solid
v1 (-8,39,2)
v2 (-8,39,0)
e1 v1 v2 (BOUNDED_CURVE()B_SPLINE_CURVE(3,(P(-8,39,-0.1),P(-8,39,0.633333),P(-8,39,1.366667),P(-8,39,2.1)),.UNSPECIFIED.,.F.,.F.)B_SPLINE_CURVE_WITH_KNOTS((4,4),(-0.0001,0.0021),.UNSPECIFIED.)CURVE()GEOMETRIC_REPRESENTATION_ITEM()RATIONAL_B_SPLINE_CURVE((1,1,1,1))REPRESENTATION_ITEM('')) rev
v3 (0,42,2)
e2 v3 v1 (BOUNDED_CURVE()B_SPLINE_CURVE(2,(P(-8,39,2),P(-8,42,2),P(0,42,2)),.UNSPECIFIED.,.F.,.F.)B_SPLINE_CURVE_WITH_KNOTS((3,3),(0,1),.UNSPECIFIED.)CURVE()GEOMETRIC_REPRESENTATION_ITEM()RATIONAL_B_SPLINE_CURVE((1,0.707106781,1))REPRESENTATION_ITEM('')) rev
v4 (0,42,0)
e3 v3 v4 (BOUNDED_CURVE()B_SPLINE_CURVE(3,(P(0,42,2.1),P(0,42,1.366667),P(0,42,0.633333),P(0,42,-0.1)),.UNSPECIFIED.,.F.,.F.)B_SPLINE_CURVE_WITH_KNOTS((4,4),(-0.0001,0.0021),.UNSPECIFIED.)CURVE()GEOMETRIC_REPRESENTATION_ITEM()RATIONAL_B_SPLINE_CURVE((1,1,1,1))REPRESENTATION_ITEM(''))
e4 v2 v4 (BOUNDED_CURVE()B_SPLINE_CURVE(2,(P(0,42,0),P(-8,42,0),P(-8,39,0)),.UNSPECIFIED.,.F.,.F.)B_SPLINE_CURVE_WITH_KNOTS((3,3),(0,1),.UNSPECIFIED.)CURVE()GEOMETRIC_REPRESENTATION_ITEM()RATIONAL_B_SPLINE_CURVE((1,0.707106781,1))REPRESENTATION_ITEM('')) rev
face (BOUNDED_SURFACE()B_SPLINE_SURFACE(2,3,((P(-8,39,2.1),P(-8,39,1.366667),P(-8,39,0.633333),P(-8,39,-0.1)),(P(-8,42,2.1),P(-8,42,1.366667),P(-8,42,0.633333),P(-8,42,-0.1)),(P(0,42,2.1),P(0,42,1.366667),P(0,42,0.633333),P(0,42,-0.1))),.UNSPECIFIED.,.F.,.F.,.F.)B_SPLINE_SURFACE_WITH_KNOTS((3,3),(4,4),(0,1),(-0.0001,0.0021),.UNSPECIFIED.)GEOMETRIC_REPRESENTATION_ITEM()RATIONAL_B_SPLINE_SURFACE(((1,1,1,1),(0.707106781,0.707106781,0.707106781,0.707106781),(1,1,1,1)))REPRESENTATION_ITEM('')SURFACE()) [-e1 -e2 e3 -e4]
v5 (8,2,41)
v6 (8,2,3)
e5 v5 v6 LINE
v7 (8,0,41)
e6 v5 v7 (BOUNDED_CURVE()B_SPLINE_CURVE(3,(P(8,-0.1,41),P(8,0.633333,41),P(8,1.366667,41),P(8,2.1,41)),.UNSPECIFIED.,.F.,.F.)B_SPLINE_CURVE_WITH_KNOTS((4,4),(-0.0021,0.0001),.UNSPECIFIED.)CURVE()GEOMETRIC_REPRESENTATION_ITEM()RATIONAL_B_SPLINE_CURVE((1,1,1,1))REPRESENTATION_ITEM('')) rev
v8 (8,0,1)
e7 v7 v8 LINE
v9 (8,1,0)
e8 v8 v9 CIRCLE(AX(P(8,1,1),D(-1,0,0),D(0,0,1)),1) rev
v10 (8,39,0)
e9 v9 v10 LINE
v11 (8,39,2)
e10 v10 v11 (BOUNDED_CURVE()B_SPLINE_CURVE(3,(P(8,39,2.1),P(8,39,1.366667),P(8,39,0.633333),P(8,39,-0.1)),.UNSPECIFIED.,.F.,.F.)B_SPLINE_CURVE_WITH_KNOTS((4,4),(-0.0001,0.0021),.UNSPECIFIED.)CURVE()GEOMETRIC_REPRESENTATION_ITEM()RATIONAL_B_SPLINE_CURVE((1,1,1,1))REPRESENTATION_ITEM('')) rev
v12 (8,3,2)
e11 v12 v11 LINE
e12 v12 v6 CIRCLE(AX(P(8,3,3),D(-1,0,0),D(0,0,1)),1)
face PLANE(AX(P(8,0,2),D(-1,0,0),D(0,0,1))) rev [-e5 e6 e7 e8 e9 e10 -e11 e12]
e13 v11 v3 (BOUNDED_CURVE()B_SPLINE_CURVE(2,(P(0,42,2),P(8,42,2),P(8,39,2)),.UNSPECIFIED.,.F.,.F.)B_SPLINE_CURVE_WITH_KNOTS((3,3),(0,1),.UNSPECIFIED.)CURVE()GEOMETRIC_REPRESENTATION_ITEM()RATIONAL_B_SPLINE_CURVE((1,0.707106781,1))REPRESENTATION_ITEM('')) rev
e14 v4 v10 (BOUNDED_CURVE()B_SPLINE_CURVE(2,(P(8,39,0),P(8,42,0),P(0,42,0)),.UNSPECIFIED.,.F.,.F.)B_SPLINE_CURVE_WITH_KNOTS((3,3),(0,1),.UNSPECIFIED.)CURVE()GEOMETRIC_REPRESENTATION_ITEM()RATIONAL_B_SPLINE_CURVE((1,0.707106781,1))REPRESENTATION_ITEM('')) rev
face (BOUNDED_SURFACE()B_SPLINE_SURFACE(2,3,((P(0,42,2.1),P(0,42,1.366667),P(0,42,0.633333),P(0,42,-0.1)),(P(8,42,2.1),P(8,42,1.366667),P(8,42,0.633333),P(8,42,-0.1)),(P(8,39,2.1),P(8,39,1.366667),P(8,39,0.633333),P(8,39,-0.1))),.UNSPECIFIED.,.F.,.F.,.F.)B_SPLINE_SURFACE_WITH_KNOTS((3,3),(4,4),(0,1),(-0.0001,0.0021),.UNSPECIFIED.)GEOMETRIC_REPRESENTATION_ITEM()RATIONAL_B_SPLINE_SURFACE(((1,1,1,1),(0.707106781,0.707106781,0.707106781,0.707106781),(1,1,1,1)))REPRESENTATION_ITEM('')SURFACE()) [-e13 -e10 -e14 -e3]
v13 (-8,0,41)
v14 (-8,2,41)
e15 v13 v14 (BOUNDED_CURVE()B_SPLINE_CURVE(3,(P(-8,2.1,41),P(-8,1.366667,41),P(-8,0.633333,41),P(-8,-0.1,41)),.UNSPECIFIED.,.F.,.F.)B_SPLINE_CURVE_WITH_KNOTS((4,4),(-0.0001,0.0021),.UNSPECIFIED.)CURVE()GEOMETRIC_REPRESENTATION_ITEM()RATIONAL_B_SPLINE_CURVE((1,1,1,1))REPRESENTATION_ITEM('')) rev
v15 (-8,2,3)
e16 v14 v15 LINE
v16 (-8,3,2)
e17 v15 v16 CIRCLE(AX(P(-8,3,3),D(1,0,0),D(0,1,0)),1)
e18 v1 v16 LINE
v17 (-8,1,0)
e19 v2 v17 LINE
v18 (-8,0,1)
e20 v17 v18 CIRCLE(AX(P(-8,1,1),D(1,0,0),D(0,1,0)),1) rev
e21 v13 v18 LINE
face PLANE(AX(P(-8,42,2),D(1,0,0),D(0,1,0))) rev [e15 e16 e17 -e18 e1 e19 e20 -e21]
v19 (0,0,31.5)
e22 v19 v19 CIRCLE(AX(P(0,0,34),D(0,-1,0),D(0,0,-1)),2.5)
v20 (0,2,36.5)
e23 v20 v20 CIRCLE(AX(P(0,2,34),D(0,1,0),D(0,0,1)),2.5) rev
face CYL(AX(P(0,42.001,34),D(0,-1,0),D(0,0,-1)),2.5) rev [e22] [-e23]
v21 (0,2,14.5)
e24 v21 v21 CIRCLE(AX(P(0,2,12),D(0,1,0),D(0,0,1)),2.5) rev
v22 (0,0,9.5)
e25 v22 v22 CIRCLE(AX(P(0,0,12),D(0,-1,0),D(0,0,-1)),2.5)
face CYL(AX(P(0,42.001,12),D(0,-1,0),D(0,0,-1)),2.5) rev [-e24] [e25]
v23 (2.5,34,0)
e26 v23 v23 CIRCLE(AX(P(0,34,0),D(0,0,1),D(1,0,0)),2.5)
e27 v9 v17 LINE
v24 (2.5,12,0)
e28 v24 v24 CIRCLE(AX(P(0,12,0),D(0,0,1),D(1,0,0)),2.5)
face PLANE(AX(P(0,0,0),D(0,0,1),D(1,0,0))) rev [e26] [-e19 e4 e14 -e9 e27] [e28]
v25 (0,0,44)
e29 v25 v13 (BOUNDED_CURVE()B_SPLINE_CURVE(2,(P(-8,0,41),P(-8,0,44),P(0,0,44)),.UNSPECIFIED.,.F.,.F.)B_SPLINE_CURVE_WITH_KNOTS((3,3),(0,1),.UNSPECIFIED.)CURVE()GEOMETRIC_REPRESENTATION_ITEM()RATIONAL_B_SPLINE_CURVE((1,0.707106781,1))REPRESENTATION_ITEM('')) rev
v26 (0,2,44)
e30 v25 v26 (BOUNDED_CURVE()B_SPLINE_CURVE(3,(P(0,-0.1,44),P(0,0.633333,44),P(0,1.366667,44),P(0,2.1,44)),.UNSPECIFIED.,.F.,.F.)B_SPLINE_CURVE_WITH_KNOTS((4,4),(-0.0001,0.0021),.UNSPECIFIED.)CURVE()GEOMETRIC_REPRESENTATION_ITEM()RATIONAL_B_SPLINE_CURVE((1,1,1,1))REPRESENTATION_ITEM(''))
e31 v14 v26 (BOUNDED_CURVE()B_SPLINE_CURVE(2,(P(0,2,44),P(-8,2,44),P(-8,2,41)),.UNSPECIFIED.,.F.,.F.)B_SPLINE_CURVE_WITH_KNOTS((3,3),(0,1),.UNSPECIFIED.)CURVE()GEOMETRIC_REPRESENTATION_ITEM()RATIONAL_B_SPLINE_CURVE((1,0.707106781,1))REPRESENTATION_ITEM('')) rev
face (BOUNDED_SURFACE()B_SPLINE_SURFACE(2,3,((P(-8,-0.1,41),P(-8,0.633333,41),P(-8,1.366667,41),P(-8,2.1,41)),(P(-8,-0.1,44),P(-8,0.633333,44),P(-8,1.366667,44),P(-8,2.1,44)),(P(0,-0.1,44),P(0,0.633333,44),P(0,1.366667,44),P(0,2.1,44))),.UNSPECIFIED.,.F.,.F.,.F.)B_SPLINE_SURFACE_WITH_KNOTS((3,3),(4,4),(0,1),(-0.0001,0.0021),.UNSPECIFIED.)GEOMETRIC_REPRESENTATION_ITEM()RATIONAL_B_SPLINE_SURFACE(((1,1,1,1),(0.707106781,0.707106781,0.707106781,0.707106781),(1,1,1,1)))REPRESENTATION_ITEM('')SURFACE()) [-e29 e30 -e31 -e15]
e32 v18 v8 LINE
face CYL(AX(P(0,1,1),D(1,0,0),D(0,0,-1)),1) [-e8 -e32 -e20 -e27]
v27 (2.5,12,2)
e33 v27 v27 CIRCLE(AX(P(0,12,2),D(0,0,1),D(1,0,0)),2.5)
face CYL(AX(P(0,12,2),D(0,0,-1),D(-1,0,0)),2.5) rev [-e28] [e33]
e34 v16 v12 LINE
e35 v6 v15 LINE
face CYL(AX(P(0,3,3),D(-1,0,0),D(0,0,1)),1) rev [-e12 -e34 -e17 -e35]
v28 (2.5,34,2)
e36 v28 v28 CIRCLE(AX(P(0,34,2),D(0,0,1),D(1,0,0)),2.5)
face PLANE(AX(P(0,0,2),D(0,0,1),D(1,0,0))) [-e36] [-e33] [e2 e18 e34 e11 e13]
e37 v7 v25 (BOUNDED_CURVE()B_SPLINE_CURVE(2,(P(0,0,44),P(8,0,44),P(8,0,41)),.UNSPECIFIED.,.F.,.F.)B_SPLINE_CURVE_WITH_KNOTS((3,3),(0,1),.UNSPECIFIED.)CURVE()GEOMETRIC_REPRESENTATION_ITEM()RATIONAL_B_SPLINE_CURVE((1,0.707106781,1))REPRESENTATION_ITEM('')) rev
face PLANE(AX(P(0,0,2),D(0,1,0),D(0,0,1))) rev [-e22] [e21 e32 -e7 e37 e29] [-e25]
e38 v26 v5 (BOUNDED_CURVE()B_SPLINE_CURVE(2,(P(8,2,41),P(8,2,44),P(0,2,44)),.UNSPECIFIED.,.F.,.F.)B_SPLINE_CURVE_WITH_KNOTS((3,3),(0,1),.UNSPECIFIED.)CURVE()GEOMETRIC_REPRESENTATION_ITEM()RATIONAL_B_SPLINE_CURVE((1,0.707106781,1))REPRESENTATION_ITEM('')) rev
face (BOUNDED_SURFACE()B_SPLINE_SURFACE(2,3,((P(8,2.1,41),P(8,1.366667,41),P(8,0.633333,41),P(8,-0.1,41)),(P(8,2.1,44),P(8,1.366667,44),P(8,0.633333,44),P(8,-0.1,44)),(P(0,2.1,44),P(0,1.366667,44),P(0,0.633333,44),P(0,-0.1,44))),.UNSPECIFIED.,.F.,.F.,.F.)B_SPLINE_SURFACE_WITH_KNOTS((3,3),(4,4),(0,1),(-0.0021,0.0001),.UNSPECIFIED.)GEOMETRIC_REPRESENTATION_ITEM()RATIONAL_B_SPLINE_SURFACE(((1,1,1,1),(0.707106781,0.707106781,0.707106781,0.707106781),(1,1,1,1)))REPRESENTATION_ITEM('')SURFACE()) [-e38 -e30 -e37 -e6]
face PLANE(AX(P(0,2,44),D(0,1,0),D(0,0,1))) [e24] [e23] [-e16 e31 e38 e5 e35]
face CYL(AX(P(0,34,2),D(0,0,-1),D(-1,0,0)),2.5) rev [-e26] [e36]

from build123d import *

# Parameters (mm, degrees)
ESQUISSE1_R             = 2.5
BOSS_EXTRU_1_DEPTH      = 2
ESQUISSE2_W             = 16
ESQUISSE2_H             = 2
BOSS_EXTRU_2_DEPTH      = 42
CONG_1_R                = 1
ENL_V_MAT_EXTRU_1_REACH = 63.351
ESQUISSE3_R             = 2.5
CONG_2_SIZE             = 3
CONG_2_SIZE_2           = 8
CONG_3_SIZE             = 3
CONG_3_SIZE_2           = 8


with BuildPart() as part:
    # Esquisse1 → Boss.-Extru.1 (new body)
    with BuildSketch(Plane.XY):
        Polygon((0, 0), (8, 0), (8, 42), (-8, 42), (-8, 0), align=None)
        with Locations((0, 12)):
            Circle(ESQUISSE1_R, mode=Mode.SUBTRACT)
        with Locations((0, 34)):
            Circle(ESQUISSE1_R, mode=Mode.SUBTRACT)
    extrude(amount=BOSS_EXTRU_1_DEPTH)

    # Esquisse2 → Boss.-Extru.2 (add)
    with BuildSketch(Plane.XY.offset(2)):
        with Locations((0, 1)):
            Rectangle(ESQUISSE2_W, ESQUISSE2_H)
    extrude(amount=BOSS_EXTRU_2_DEPTH)

    # Congé1
    cong_1_edges = [part.edges().sort_by_distance(p)[0] for p in [
        (0, 2, 2),
        (0, 0, 0),
    ]]
    fillet(cong_1_edges, radius=CONG_1_R)

    # Esquisse3 → Enlèv. mat.-Extru.1 (cut, up to next)
    with BuildSketch(Plane.XZ, mode=Mode.PRIVATE) as enl_v_mat_extru_1_sk1:
        with Locations(Location((0, 12, 0), (0, 0, 270))):
            Circle(ESQUISSE3_R)
    enl_v_mat_extru_1_tool1 = extrude(enl_v_mat_extru_1_sk1.sketch, amount=-ENL_V_MAT_EXTRU_1_REACH, mode=Mode.PRIVATE) & part.part
    # Esquisse3 → Enlèv. mat.-Extru.1 (cut, up to next)
    with BuildSketch(Plane.XZ, mode=Mode.PRIVATE) as enl_v_mat_extru_1_sk2:
        with Locations(Location((0, 34, 0), (0, 0, 270))):
            Circle(ESQUISSE3_R)
    enl_v_mat_extru_1_tool2 = extrude(enl_v_mat_extru_1_sk2.sketch, amount=-ENL_V_MAT_EXTRU_1_REACH, mode=Mode.PRIVATE) & part.part
    add(enl_v_mat_extru_1_tool1.solids().sort_by_distance((0, 0, 12))[0], mode=Mode.SUBTRACT)
    add(enl_v_mat_extru_1_tool2.solids().sort_by_distance((0, 0, 34))[0], mode=Mode.SUBTRACT)

    # Congé2
    # an asymmetric fillet: 8, 3 mm, written as the material it takes off along each edge
    with BuildSketch(Plane(origin=(8, 42, -20), x_dir=(0, -1, 0), z_dir=(0, 0, 1))) as cong_2_piece_1:
        with BuildLine():
            Bezier((CONG_2_SIZE, 0), (0, 0), (0, -CONG_2_SIZE_2), weights=[1, 0.707106781, 1])
            Line((0, -CONG_2_SIZE_2), (0, 0))
            Line((0, 0), (CONG_2_SIZE, 0))
        make_face()
    extrude(amount=42, mode=Mode.SUBTRACT)
    with BuildSketch(Plane(origin=(-8, 22, 44), x_dir=(1, 0, 0), z_dir=(0, -1, 0))) as cong_2_piece_2:
        with BuildLine():
            Bezier((CONG_2_SIZE_2, 0), (0, 0), (0, -CONG_2_SIZE), weights=[1, 0.707106781, 1])
            Line((0, -CONG_2_SIZE), (0, 0))
            Line((0, 0), (CONG_2_SIZE_2, 0))
        make_face()
    extrude(amount=42, mode=Mode.SUBTRACT)
    with BuildSketch(Plane(origin=(8, -20, 44), x_dir=(0, 0, -1), z_dir=(0, 1, 0))) as cong_2_piece_3:
        with BuildLine():
            Bezier((CONG_2_SIZE, 0), (0, 0), (0, CONG_2_SIZE_2), weights=[1, 0.707106781, 1])
            Line((0, CONG_2_SIZE_2), (0, 0))
            Line((0, 0), (CONG_2_SIZE, 0))
        make_face()
    extrude(amount=42, mode=Mode.SUBTRACT)

    # Congé3
    # an asymmetric fillet: 8, 3 mm, written as the material it takes off along each edge
    with BuildSketch(Plane(origin=(-8, 42, -20), x_dir=(0, -1, 0), z_dir=(0, 0, 1))) as cong_3_piece_1:
        with BuildLine():
            Bezier((CONG_3_SIZE, 0), (0, 0), (0, CONG_3_SIZE_2), weights=[1, 0.707106781, 1])
            Line((0, CONG_3_SIZE_2), (0, 0))
            Line((0, 0), (CONG_3_SIZE, 0))
        make_face()
    extrude(amount=42, mode=Mode.SUBTRACT)


solid = part.part
